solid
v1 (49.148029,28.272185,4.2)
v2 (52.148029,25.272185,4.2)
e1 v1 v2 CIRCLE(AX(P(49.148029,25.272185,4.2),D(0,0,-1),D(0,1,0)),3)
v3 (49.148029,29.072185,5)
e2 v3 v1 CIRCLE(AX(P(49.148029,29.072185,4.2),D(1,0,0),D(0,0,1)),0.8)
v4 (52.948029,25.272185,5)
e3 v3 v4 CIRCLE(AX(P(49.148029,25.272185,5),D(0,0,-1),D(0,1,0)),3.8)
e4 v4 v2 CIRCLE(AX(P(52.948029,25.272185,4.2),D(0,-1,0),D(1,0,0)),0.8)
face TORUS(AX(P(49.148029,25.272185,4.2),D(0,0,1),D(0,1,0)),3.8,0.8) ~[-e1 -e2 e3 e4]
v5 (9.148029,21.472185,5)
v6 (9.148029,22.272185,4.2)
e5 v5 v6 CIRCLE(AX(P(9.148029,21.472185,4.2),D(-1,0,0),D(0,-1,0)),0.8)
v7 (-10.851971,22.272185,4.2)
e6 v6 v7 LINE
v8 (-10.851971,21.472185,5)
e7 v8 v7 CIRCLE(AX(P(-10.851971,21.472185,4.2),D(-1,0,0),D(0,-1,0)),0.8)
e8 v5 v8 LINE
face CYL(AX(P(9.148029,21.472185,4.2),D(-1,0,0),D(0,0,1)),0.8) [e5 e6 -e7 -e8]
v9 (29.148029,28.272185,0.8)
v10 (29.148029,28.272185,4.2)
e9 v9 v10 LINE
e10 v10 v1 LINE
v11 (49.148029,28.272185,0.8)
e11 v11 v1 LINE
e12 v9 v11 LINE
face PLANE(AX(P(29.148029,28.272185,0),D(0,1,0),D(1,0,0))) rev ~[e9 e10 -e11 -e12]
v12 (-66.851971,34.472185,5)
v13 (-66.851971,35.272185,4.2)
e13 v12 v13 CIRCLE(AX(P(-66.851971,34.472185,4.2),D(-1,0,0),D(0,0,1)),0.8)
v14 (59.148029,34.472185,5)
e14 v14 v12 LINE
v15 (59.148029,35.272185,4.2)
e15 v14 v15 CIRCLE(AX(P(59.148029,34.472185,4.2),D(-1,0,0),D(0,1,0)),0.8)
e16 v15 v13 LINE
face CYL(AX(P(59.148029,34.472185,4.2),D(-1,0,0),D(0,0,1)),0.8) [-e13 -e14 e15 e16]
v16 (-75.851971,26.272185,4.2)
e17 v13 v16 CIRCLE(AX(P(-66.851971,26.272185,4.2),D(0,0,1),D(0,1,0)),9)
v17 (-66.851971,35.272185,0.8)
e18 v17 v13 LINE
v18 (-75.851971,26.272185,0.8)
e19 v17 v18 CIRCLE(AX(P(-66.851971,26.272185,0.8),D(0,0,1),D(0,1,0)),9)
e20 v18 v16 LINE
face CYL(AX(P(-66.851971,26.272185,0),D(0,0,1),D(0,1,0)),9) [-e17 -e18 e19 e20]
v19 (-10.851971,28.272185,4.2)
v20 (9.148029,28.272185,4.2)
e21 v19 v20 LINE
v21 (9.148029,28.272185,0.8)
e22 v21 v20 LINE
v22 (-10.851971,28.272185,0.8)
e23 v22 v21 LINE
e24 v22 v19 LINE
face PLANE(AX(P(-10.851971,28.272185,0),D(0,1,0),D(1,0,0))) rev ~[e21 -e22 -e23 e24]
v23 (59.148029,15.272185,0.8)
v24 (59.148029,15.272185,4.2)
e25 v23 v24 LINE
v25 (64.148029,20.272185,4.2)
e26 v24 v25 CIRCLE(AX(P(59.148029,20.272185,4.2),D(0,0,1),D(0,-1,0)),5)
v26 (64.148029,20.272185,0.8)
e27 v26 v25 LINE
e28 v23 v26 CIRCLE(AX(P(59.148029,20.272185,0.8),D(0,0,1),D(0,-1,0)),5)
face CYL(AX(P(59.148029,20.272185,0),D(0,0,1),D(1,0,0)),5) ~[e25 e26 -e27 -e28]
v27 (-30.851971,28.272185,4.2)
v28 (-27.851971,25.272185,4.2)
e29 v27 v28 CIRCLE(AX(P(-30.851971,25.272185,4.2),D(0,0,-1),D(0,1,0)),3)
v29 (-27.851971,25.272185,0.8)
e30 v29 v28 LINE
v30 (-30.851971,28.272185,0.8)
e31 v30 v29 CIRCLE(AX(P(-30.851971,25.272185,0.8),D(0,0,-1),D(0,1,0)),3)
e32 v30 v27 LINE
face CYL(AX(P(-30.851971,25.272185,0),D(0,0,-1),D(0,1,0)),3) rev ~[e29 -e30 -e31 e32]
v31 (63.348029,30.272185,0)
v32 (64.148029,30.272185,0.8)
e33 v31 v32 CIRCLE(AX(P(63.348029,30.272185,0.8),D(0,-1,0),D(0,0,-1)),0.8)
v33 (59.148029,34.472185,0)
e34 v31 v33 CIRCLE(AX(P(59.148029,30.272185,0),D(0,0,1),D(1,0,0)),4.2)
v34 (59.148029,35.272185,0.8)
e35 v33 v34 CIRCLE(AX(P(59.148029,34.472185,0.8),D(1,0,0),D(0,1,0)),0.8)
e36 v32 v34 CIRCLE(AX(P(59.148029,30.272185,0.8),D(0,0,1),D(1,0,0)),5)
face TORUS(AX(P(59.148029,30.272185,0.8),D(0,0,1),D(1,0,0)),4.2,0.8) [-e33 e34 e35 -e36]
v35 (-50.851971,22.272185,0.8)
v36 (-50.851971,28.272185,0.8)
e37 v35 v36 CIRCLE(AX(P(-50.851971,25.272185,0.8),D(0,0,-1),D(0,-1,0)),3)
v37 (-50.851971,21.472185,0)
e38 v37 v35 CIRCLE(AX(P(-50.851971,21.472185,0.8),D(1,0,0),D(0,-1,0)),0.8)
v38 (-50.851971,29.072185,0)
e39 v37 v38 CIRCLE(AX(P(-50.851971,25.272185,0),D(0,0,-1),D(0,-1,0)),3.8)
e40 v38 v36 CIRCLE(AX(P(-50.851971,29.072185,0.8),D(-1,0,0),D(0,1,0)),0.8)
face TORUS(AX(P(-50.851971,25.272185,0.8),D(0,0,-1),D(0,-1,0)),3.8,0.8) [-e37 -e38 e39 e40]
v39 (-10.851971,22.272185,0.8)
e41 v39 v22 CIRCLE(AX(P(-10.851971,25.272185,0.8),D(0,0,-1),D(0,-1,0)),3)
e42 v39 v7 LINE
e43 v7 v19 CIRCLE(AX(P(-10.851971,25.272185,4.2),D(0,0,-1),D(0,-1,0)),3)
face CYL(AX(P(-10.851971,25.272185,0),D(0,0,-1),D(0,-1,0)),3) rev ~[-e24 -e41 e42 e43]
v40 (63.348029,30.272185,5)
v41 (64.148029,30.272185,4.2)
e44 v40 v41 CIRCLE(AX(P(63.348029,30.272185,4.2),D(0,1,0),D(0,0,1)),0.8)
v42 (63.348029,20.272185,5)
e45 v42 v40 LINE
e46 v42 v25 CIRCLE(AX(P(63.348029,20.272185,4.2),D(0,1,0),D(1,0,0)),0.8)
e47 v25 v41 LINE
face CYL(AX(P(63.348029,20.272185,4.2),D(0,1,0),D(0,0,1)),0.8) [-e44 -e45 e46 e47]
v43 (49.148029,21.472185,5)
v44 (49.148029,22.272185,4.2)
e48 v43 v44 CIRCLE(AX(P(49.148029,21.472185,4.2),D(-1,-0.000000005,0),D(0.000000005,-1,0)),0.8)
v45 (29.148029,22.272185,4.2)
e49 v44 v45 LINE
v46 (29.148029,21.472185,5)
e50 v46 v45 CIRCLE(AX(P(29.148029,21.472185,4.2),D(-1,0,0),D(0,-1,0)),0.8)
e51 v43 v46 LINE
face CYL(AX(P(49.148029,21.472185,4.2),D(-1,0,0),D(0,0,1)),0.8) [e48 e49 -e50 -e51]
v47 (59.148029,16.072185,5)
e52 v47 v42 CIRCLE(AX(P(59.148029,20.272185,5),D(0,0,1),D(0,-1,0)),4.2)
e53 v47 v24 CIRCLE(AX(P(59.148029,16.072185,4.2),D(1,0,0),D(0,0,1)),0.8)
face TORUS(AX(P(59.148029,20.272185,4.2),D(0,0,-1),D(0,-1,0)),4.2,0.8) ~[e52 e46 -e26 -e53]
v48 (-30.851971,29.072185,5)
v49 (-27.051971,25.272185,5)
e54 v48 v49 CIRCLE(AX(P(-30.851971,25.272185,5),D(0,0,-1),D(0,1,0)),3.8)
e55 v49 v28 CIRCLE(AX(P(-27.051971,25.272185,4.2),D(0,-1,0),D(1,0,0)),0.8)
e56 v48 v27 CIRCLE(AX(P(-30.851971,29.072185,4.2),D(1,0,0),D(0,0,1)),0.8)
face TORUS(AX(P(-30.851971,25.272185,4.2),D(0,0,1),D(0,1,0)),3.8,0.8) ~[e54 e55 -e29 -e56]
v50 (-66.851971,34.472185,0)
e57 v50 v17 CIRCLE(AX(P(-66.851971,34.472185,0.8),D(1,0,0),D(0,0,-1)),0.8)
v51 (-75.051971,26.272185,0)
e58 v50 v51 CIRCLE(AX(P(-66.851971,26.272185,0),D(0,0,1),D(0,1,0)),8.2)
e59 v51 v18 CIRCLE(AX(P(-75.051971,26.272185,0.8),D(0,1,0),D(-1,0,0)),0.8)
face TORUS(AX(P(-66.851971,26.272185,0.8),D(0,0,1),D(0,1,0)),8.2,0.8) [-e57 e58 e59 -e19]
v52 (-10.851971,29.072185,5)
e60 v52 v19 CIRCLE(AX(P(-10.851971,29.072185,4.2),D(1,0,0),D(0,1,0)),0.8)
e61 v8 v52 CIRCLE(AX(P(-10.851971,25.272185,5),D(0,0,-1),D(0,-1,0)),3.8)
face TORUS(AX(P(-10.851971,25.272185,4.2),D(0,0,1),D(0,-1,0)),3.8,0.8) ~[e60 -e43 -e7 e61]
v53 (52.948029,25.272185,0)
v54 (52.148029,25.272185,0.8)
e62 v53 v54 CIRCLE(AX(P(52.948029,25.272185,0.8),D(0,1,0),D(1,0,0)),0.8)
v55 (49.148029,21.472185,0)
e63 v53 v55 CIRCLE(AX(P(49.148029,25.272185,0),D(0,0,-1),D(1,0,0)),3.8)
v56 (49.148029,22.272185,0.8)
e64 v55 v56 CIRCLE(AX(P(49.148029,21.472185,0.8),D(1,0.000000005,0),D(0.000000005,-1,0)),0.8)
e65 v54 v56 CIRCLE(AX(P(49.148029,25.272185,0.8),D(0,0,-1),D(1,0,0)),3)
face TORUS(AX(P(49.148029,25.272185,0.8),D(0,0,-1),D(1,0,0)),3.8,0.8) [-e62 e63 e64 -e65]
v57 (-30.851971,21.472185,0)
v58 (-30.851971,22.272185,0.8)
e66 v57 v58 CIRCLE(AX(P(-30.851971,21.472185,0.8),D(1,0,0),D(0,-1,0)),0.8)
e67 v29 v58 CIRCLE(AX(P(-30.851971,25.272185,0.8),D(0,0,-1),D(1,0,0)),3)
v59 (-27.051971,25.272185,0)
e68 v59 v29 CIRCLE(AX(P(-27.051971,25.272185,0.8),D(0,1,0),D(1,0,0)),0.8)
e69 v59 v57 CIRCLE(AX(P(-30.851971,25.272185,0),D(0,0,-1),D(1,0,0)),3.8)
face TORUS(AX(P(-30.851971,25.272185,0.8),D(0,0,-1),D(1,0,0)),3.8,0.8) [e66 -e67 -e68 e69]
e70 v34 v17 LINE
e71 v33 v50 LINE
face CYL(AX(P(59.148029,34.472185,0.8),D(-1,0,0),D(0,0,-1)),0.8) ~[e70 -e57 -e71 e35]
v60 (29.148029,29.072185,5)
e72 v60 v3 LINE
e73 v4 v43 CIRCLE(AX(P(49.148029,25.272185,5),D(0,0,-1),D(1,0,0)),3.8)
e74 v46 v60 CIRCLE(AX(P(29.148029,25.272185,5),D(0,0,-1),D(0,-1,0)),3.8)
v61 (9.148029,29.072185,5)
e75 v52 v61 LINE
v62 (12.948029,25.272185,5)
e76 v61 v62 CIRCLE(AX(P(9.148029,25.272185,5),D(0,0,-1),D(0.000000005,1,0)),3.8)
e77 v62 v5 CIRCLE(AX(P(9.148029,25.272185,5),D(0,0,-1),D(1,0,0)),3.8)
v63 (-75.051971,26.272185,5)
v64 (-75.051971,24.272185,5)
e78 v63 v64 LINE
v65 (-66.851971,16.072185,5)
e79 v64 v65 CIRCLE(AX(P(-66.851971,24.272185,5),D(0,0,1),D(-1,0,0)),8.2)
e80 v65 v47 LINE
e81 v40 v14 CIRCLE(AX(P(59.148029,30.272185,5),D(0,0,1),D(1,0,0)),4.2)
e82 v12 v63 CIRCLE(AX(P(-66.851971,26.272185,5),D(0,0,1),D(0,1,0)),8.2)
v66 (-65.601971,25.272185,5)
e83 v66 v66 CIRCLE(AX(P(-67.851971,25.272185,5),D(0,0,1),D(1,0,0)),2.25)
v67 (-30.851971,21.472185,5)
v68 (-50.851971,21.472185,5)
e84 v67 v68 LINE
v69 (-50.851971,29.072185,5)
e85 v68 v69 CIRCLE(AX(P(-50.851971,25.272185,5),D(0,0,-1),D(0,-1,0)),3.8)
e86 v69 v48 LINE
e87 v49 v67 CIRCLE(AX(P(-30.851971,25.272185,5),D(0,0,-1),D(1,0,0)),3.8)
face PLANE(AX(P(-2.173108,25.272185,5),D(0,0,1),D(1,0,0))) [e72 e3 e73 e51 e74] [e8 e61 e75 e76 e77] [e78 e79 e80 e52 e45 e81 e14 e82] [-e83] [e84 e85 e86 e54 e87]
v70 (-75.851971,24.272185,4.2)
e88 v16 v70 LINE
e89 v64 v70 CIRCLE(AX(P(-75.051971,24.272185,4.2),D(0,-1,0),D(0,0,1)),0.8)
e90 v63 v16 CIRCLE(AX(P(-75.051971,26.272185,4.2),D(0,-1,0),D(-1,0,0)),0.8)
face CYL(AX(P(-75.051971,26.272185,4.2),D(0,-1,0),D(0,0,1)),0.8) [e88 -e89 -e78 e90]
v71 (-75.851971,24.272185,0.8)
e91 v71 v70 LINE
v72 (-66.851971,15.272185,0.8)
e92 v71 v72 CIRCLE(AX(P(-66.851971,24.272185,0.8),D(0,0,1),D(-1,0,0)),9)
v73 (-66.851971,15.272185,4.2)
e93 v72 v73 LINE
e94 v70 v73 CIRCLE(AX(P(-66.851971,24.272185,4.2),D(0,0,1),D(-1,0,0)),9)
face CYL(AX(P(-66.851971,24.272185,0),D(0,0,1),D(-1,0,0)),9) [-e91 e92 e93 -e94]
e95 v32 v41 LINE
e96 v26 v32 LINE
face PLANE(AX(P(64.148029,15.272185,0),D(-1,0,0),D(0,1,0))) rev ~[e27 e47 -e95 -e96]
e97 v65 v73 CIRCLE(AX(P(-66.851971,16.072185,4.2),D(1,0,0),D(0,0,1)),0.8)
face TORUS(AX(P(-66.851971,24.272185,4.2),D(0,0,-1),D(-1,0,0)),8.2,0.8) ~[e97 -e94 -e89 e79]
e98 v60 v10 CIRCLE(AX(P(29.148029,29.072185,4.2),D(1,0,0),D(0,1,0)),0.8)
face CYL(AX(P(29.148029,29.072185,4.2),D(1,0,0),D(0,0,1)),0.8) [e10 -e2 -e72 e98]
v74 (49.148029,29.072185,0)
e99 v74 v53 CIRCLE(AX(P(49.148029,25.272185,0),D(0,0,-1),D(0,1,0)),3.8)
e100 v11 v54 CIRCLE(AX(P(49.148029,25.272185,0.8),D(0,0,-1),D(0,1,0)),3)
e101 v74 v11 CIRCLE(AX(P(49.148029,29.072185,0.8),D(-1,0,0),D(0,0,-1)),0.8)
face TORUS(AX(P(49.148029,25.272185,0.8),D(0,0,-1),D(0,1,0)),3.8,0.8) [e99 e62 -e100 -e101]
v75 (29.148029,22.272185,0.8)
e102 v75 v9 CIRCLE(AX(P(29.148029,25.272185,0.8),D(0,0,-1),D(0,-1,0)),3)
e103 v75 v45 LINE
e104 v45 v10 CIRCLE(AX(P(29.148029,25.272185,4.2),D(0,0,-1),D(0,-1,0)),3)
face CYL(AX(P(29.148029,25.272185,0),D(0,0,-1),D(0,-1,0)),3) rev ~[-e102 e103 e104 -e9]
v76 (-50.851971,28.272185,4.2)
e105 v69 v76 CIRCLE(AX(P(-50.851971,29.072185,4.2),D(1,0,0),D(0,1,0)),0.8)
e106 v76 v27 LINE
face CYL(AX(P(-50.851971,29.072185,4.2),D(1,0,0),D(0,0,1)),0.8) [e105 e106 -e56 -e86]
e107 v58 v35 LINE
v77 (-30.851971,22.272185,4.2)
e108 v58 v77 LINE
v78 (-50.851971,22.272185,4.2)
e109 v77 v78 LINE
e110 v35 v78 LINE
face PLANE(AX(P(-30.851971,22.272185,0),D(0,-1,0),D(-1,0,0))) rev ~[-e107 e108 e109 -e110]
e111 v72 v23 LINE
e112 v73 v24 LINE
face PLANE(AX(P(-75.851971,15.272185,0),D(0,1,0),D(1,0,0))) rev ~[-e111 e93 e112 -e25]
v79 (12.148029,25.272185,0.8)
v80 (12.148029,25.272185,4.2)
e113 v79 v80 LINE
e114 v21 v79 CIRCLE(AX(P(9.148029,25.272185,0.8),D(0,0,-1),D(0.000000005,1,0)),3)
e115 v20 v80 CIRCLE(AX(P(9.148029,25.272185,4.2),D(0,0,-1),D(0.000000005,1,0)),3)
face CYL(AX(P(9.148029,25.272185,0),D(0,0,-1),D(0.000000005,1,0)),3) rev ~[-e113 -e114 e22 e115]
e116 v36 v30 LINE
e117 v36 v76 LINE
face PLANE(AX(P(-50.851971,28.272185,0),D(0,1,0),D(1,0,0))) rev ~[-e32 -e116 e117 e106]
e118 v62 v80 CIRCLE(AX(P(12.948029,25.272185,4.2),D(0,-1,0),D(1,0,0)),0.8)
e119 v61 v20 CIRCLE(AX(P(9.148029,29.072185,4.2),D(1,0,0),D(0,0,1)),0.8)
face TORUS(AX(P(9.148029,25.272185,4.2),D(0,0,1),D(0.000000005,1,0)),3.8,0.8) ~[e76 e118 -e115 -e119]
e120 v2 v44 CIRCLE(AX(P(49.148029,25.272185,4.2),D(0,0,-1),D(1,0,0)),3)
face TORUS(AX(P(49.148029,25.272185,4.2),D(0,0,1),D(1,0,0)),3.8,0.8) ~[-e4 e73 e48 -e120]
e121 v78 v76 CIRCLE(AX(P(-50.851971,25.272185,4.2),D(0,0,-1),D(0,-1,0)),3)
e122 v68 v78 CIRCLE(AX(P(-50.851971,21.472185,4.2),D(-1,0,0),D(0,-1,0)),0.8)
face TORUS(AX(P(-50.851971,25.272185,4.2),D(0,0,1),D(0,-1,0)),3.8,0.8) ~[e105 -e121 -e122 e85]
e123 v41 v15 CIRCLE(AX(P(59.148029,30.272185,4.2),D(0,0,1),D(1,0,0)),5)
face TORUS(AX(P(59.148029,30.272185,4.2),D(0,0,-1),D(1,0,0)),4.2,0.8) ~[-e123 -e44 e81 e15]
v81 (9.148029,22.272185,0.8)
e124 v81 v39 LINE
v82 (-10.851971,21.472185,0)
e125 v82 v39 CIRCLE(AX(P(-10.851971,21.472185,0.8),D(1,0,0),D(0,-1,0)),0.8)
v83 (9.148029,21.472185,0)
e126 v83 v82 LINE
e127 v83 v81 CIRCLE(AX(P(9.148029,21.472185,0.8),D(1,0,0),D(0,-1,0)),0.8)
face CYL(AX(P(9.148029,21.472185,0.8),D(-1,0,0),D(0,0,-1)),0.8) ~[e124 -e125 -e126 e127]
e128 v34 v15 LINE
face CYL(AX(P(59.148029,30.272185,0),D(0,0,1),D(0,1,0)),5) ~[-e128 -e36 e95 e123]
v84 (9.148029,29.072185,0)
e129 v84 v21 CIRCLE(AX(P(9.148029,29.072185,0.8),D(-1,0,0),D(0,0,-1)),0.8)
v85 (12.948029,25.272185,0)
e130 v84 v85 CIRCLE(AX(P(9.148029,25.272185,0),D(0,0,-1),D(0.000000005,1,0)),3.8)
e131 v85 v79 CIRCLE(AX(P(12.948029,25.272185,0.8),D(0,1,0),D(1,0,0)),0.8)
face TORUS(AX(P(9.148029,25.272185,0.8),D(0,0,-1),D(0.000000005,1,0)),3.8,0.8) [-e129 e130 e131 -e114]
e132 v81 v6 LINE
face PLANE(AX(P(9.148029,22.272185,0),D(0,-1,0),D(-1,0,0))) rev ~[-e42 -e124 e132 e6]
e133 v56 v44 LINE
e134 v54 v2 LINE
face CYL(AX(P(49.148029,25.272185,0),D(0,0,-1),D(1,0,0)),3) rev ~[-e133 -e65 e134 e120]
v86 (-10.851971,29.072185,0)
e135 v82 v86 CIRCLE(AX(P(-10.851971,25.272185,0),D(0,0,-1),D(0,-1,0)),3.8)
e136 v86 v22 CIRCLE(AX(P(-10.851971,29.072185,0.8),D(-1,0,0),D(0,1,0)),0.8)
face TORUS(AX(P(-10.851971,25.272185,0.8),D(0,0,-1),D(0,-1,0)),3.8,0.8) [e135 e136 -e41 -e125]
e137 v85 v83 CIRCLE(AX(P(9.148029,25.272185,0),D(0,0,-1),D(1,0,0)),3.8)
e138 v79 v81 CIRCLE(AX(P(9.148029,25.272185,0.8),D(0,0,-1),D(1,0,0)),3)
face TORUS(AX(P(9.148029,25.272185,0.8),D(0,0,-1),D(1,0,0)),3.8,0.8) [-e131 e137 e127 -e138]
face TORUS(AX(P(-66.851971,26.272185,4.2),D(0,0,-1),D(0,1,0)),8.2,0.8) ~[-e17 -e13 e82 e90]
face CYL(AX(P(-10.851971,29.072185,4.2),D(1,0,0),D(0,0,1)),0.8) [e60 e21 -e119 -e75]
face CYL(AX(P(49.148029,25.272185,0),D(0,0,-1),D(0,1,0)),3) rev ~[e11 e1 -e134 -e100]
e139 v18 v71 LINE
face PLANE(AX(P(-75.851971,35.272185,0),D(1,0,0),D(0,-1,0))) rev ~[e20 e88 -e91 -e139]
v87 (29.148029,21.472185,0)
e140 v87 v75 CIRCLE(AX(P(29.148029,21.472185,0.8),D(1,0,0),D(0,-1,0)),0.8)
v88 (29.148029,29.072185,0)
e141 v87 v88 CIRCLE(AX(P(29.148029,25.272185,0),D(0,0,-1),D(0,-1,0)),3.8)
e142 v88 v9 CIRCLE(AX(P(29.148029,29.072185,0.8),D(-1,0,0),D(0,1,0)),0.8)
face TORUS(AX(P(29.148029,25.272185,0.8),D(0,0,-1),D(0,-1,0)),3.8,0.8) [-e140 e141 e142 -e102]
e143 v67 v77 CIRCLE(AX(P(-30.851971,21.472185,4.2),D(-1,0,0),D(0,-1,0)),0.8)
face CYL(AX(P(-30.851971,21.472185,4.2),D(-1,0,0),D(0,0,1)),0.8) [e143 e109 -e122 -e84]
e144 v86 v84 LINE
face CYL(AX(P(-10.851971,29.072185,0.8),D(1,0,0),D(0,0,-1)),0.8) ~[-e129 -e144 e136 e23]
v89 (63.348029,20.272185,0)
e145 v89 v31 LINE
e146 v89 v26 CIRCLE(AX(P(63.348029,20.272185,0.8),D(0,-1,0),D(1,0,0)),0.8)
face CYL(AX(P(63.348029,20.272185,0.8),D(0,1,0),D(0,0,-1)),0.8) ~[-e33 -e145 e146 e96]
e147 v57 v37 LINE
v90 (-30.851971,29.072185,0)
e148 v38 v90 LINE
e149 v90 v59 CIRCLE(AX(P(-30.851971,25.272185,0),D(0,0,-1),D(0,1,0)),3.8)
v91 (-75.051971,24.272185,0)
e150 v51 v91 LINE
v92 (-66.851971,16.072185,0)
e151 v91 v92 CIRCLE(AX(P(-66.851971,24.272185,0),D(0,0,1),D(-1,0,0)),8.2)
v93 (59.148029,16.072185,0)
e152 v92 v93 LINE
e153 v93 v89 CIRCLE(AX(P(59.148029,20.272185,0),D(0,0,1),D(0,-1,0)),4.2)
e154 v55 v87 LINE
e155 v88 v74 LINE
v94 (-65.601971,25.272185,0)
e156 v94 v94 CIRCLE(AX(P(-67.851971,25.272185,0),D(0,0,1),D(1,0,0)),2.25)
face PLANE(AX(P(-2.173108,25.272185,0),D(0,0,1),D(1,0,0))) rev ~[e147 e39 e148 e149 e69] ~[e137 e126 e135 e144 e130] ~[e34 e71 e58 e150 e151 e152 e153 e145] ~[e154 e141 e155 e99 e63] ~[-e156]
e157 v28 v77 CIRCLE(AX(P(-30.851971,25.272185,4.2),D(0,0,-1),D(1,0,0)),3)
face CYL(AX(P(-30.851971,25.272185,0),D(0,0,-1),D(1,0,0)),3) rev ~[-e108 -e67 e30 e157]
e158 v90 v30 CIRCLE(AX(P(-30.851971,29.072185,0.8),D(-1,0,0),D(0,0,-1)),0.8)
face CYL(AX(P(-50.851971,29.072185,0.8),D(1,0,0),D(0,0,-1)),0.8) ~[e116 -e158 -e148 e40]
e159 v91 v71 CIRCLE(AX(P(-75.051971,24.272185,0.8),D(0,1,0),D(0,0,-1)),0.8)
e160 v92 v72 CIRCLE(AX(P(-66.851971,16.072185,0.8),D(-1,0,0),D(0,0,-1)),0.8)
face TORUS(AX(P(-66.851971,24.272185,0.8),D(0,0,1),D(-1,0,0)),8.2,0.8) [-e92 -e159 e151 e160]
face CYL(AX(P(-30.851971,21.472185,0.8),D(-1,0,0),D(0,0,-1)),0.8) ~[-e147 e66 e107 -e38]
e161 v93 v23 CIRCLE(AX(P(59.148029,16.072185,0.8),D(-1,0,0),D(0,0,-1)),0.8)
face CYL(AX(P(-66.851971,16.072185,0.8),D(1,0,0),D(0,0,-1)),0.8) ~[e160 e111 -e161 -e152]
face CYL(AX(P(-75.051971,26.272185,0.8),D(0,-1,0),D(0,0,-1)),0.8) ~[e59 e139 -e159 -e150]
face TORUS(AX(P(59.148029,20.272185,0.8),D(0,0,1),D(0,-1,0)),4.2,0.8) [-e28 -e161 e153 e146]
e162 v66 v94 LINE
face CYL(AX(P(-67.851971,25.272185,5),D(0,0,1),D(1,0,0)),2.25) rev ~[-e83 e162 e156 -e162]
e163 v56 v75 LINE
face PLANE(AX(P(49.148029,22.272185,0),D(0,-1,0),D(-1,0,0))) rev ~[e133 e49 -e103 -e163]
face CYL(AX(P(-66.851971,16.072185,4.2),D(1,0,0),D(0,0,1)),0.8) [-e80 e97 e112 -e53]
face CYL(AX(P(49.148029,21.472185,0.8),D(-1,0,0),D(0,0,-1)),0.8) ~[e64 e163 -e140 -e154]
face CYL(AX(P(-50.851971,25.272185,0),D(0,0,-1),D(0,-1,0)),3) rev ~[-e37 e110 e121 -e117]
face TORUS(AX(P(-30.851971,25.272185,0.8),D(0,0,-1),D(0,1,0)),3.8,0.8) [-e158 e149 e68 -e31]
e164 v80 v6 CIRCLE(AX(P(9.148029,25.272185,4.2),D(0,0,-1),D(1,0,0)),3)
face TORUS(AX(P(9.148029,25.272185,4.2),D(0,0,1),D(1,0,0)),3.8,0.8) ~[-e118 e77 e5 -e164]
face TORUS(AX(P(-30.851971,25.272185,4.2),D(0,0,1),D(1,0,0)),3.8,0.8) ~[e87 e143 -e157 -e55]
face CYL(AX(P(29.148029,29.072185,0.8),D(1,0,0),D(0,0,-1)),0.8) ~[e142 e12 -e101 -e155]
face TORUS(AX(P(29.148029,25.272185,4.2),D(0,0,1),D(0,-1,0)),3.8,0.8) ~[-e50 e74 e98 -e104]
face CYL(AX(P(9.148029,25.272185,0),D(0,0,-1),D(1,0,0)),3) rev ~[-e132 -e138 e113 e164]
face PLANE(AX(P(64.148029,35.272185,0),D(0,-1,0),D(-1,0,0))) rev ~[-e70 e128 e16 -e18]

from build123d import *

# Parameters (mm, degrees)
F1_DEPTH = 5
F2_R     = 9
F3_R     = 5
F4_R     = 0.8
F5_R     = 2.25
F6_DEPTH = 25


# Not quite as in the source:
# - a feature names something its author has since deleted; it is built from what else it names


with BuildPart() as f1:
    # F0 (on Top) → F1 (new body)
    with BuildSketch(Plane.XY):
        with BuildLine():
            Line((64.1480287884, 35.2721845528), (-75.8519712116, 35.2721845528))
            Line((-75.8519712116, 35.2721845528), (-75.8519712116, 15.2721845528))
            Line((-75.8519712116, 15.2721845528), (64.1480287884, 15.2721845528))
            Line((64.1480287884, 15.2721845528), (64.1480287884, 22.2721845528))
            Line((64.1480287884, 22.2721845528), (49.148028803, 22.2721845528))
            Line((49.148028803, 22.2721845528), (29.1480287884, 22.2721845528))
            Line((29.1480287884, 22.2721845528), (9.1480287884, 22.2721845528))
            Line((9.1480287884, 22.2721845528), (-10.8519712116, 22.2721845528))
            Line((-10.8519712116, 22.2721845528), (-30.8519712116, 22.2721845528))
            Line((-30.8519712116, 22.2721845528), (-50.8519712116, 22.2721845528))
            ThreePointArc((-50.8519712116, 22.2721845528), (-53.8519712116, 25.2721845528), (-50.8519712116, 28.2721845528))
            Line((-50.8519712116, 28.2721845528), (-30.8519712116, 28.2721845528))
            Line((-30.8519712116, 28.2721845528), (-10.8519712116, 28.2721845528))
            Line((-10.8519712116, 28.2721845528), (9.1480288048, 28.2721845528))
            Line((9.1480288048, 28.2721845528), (29.1480287884, 28.2721845528))
            Line((29.1480287884, 28.2721845528), (49.1480287884, 28.2721845528))
            Line((49.1480287884, 28.2721845528), (64.1480287884, 28.2721845528))
            Line((64.1480287884, 28.2721845528), (64.1480287884, 35.2721845528))
        make_face()
        with BuildLine():
            Line((64.1480287884, 22.2721845528), (64.1480287884, 28.2721845528))
            Line((64.1480287884, 28.2721845528), (49.1480287884, 28.2721845528))
            ThreePointArc((49.1480287884, 28.2721845528), (51.269349132, 27.3935048963), (52.1480287884, 25.2721845528))
            ThreePointArc((52.1480287884, 25.2721845528), (51.2693491371, 23.1508642144), (49.148028803, 22.2721845528))
            Line((49.148028803, 22.2721845528), (64.1480287884, 22.2721845528))
        make_face()
        with BuildLine():
            ThreePointArc((29.1480287884, 22.2721845528), (26.1480287884, 25.2721845528), (29.1480287884, 28.2721845528))
            Line((29.1480287884, 28.2721845528), (9.1480288048, 28.2721845528))
            ThreePointArc((9.1480288048, 28.2721845528), (11.2693491378, 27.3935048905), (12.1480287884, 25.2721845528))
            ThreePointArc((12.1480287884, 25.2721845528), (11.269349132, 23.1508642092), (9.1480287884, 22.2721845528))
            Line((9.1480287884, 22.2721845528), (29.1480287884, 22.2721845528))
        make_face()
        with BuildLine():
            ThreePointArc((-10.8519712116, 22.2721845528), (-13.8519712116, 25.2721845528), (-10.8519712116, 28.2721845528))
            Line((-10.8519712116, 28.2721845528), (-30.8519712116, 28.2721845528))
            ThreePointArc((-30.8519712116, 28.2721845528), (-28.730650868, 27.3935048963), (-27.8519712116, 25.2721845528))
            ThreePointArc((-27.8519712116, 25.2721845528), (-28.730650868, 23.1508642092), (-30.8519712116, 22.2721845528))
            Line((-30.8519712116, 22.2721845528), (-10.8519712116, 22.2721845528))
        make_face()
    extrude(amount=F1_DEPTH)

    # F2
    f2_edges = [f1.edges().sort_by_distance(p)[0] for p in [
        (-75.851971, 35.272185, 2.5),
        (-75.851971, 15.272185, 2.5),
    ]]
    fillet(f2_edges, radius=F2_R)

    # F3
    f3_edges = [f1.edges().sort_by_distance(p)[0] for p in [
        (64.148029, 15.272185, 2.5),
        (64.148029, 35.272185, 2.5),
    ]]
    fillet(f3_edges, radius=F3_R)

    # F4
    f4_edges = [f1.edges().sort_by_distance(p)[0] for p in [
        (-13.851971, 25.272185, 5),
        (26.148029, 25.272185, 5),
        (-53.851971, 25.272185, 5),
        (26.148029, 25.272185, 0),
        (-13.851971, 25.272185, 0),
        (-53.851971, 25.272185, 0),
        (-3.851971, 15.272185, 5),
        (-3.851971, 15.272185, 0),
    ]]
    fillet(f4_edges, radius=F4_R)

    # F5 (on face) → F6 (cut)
    with BuildSketch(Plane.XY.offset(5)):
        with Locations((-67.8519712116, 25.2721845528)):
            Circle(F5_R)
    extrude(amount=-F6_DEPTH, mode=Mode.SUBTRACT)


solid = f1.part
